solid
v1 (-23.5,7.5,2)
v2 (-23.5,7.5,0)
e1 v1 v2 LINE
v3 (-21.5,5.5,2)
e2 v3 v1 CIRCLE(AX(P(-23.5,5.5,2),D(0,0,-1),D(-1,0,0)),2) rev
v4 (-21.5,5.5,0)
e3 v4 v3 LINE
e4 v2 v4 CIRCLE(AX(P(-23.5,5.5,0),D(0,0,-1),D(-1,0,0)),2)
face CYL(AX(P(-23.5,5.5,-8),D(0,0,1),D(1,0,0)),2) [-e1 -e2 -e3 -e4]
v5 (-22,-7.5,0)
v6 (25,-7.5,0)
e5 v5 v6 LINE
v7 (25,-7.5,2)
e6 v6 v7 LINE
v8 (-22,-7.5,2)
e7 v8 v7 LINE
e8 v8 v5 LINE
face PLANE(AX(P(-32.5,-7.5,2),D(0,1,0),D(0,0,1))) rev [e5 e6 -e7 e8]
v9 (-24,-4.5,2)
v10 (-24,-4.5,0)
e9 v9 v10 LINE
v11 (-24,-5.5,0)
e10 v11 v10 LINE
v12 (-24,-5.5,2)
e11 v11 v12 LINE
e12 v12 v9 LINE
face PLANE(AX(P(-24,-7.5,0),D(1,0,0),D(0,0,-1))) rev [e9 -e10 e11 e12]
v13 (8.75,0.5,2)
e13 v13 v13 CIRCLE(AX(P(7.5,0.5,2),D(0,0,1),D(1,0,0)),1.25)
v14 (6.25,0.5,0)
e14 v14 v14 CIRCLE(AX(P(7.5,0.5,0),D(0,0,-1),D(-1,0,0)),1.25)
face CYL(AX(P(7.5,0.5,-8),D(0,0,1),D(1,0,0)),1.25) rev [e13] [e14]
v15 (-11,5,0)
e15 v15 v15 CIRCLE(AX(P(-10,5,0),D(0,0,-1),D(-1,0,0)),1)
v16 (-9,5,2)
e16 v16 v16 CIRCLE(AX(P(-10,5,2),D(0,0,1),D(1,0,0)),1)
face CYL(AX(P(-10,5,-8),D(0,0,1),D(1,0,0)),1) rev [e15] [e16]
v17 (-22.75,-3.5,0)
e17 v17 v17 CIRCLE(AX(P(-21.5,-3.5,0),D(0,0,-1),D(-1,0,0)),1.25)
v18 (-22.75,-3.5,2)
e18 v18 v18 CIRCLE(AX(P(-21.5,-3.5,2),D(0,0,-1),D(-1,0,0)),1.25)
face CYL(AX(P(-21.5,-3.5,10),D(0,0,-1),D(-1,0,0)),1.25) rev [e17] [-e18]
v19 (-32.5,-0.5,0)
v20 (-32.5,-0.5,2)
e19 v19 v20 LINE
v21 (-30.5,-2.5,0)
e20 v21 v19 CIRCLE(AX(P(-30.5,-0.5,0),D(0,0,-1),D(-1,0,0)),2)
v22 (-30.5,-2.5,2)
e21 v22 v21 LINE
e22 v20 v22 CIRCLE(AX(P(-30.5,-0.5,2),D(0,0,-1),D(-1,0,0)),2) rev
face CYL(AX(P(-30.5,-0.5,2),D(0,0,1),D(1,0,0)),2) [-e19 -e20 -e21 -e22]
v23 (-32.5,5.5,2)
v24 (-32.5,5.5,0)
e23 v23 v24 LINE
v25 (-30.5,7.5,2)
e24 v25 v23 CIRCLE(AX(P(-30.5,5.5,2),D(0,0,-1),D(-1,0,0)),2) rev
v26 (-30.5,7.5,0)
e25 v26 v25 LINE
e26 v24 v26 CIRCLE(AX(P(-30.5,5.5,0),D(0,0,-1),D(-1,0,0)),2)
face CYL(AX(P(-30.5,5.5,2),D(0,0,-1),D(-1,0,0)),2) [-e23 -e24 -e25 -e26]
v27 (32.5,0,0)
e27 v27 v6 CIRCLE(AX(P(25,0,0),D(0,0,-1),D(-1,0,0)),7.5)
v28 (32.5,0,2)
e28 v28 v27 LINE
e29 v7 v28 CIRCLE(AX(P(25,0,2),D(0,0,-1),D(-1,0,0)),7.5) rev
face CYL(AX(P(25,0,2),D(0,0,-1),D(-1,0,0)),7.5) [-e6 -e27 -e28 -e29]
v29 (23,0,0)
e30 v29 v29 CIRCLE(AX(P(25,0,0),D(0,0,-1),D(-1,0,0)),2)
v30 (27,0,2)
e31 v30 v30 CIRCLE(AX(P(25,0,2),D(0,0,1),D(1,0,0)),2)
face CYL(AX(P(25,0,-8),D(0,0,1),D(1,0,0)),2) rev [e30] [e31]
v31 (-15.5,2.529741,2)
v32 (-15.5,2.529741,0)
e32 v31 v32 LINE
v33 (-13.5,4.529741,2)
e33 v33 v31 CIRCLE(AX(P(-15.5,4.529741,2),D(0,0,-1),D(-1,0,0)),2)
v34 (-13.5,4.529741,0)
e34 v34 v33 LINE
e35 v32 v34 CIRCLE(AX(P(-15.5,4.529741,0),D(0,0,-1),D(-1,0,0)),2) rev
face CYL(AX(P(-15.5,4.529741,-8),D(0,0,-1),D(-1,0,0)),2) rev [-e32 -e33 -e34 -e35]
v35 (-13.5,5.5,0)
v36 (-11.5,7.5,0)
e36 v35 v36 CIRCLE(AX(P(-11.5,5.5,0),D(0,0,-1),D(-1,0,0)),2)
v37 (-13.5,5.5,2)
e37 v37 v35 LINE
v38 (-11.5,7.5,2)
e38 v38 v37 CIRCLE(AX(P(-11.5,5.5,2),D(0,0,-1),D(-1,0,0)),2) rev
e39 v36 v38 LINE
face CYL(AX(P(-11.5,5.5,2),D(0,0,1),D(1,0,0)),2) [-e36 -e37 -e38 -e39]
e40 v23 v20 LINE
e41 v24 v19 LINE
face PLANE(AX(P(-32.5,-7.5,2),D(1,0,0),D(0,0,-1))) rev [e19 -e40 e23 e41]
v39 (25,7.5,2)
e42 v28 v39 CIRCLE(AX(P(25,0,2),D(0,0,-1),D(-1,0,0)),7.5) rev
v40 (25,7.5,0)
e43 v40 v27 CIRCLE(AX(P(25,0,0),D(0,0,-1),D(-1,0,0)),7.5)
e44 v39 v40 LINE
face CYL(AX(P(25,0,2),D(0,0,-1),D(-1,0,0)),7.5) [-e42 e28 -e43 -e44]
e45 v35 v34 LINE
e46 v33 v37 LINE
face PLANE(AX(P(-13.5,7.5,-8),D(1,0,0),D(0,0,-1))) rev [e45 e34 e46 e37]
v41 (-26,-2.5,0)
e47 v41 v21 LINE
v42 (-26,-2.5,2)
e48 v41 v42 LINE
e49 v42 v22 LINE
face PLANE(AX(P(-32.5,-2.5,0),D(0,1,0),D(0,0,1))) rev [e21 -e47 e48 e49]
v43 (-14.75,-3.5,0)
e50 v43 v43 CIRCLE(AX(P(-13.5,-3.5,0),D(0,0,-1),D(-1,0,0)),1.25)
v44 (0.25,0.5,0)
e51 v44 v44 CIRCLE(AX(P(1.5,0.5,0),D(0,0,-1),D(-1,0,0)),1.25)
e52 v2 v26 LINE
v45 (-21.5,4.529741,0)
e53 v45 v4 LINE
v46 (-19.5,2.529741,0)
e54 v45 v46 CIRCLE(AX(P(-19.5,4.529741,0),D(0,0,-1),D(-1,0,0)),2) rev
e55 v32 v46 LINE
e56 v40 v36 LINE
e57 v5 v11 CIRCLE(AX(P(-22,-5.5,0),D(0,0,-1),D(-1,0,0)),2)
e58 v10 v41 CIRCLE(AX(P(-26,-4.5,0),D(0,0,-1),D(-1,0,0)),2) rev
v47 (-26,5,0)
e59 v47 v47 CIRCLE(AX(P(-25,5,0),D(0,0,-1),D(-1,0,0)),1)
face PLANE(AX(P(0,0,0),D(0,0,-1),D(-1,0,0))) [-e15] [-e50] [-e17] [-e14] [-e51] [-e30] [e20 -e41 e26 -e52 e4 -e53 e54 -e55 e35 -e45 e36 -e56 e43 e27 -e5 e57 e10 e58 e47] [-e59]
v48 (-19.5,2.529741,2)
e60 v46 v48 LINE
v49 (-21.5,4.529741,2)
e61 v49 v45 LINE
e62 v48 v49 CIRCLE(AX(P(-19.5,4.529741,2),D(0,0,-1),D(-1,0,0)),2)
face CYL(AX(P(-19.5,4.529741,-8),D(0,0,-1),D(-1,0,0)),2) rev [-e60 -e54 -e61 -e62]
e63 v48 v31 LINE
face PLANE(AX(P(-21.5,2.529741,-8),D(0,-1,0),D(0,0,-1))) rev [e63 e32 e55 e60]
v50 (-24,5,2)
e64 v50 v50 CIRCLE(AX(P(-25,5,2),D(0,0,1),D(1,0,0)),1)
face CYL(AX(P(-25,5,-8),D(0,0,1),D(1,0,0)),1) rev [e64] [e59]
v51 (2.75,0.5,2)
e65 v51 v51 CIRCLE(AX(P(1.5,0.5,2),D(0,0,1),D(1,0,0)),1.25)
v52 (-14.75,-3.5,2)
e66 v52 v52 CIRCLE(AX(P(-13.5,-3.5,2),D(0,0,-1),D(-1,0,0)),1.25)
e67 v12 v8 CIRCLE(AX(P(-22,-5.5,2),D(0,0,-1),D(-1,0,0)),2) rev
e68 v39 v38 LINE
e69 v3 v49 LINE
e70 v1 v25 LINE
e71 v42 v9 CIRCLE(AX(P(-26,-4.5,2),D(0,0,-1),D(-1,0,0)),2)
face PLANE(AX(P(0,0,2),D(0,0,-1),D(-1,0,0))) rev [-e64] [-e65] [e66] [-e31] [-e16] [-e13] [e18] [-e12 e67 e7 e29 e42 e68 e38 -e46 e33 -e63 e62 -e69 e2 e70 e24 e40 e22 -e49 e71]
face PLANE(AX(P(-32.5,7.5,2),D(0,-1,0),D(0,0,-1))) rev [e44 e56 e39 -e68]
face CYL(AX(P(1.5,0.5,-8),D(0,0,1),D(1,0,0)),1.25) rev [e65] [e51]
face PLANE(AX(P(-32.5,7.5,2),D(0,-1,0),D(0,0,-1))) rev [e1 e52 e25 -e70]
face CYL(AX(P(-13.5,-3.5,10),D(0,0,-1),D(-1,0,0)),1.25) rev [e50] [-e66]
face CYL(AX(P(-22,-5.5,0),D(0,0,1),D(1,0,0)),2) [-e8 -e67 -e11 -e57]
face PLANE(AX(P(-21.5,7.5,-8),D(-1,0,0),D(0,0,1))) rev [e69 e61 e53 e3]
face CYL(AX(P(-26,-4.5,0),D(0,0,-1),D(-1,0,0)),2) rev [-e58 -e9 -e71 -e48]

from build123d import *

# Parameters (mm, degrees)
SKETCH_1_W          = 65
SKETCH_1_H          = 15
EXTRUDE_1_DEPTH     = 2
FILLET_1_R          = 7.5
SKETCH_2_R          = 2
SKETCH_2_R_2        = 1
CUT_EXTRUDE_1_DEPTH = 10
SKETCH_4_R          = 1.25
CUT_EXTRUDE_3_DEPTH = 10
SKETCH_8_R          = 1.25
CUT_EXTRUDE_6_DEPTH = 10
SKETCH_9_W          = 8
SKETCH_9_H          = 4.970258762
CUT_EXTRUDE_7_DEPTH = 10
SKETCH_10_W         = 8.5
SKETCH_10_H         = 5
CUT_EXTRUDE_8_DEPTH = 2
FILLET_3_R          = 2


with BuildPart() as part:
    # 草图1 → 凸台-拉伸1 (new body)
    with BuildSketch(Plane.XY):
        Rectangle(SKETCH_1_W, SKETCH_1_H)
    extrude(amount=EXTRUDE_1_DEPTH)

    # 圆角1
    fillet_1_edges = [part.edges().sort_by_distance(p)[0] for p in [
        (32.5, 7.5, 1),
        (32.5, -7.5, 1),
    ]]
    fillet(fillet_1_edges, radius=FILLET_1_R - 0.0001)  # a hair under: the kernel refuses the full size

    # 草图2 → 切除-拉伸1 (cut)
    with BuildSketch(Plane.XY.offset(2)):
        with Locations((25, 0)):
            Circle(SKETCH_2_R)
        with Locations((-25, 5)):
            Circle(SKETCH_2_R_2)
        with Locations((-10, 5)):
            Circle(SKETCH_2_R_2)
    extrude(amount=-CUT_EXTRUDE_1_DEPTH, mode=Mode.SUBTRACT)

    # 草图4 → 切除-拉伸3 (cut)
    with BuildSketch(Plane(origin=(0, 0, 0), x_dir=(-1, 0, 0), z_dir=(0, 0, -1))):
        with Locations((21.5, -3.5)):
            Circle(SKETCH_4_R)
        with Locations((13.5, -3.5)):
            Circle(SKETCH_4_R)
    extrude(amount=-CUT_EXTRUDE_3_DEPTH, mode=Mode.SUBTRACT)

    # 草图8 → 切除-拉伸6 (cut)
    with BuildSketch(Plane.XY.offset(2)):
        with Locations((7.5, 0.5)):
            Circle(SKETCH_8_R)
        with Locations((1.5, 0.5)):
            Circle(SKETCH_8_R)
    extrude(amount=-CUT_EXTRUDE_6_DEPTH, mode=Mode.SUBTRACT)

    # 草图9 → 切除-拉伸7 (cut)
    with BuildSketch(Plane.XY.offset(2)):
        with Locations((-17.5, 5.014870619)):
            Rectangle(SKETCH_9_W, SKETCH_9_H)
    extrude(amount=-CUT_EXTRUDE_7_DEPTH, mode=Mode.SUBTRACT)

    # 草图10 → 切除-拉伸8 (cut)
    with BuildSketch(Plane.XY.offset(2)):
        with Locations((-28.25, -5)):
            Rectangle(SKETCH_10_W, SKETCH_10_H)
    extrude(amount=-CUT_EXTRUDE_8_DEPTH, mode=Mode.SUBTRACT)

    # 圆角3
    fillet_3_edges = [part.edges().sort_by_distance(p)[0] for p in [
        (-21.5, 2.529741238, 1),
        (-21.5, 7.5, 1),
        (-13.5, 7.5, 1),
        (-13.5, 2.529741238, 1),
        (-32.5, 7.5, 1),
        (-32.5, -2.5, 1),
        (-24, -2.5, 1),
        (-24, -7.5, 1),
    ]]
    fillet(fillet_3_edges, radius=FILLET_3_R)


solid = part.part
